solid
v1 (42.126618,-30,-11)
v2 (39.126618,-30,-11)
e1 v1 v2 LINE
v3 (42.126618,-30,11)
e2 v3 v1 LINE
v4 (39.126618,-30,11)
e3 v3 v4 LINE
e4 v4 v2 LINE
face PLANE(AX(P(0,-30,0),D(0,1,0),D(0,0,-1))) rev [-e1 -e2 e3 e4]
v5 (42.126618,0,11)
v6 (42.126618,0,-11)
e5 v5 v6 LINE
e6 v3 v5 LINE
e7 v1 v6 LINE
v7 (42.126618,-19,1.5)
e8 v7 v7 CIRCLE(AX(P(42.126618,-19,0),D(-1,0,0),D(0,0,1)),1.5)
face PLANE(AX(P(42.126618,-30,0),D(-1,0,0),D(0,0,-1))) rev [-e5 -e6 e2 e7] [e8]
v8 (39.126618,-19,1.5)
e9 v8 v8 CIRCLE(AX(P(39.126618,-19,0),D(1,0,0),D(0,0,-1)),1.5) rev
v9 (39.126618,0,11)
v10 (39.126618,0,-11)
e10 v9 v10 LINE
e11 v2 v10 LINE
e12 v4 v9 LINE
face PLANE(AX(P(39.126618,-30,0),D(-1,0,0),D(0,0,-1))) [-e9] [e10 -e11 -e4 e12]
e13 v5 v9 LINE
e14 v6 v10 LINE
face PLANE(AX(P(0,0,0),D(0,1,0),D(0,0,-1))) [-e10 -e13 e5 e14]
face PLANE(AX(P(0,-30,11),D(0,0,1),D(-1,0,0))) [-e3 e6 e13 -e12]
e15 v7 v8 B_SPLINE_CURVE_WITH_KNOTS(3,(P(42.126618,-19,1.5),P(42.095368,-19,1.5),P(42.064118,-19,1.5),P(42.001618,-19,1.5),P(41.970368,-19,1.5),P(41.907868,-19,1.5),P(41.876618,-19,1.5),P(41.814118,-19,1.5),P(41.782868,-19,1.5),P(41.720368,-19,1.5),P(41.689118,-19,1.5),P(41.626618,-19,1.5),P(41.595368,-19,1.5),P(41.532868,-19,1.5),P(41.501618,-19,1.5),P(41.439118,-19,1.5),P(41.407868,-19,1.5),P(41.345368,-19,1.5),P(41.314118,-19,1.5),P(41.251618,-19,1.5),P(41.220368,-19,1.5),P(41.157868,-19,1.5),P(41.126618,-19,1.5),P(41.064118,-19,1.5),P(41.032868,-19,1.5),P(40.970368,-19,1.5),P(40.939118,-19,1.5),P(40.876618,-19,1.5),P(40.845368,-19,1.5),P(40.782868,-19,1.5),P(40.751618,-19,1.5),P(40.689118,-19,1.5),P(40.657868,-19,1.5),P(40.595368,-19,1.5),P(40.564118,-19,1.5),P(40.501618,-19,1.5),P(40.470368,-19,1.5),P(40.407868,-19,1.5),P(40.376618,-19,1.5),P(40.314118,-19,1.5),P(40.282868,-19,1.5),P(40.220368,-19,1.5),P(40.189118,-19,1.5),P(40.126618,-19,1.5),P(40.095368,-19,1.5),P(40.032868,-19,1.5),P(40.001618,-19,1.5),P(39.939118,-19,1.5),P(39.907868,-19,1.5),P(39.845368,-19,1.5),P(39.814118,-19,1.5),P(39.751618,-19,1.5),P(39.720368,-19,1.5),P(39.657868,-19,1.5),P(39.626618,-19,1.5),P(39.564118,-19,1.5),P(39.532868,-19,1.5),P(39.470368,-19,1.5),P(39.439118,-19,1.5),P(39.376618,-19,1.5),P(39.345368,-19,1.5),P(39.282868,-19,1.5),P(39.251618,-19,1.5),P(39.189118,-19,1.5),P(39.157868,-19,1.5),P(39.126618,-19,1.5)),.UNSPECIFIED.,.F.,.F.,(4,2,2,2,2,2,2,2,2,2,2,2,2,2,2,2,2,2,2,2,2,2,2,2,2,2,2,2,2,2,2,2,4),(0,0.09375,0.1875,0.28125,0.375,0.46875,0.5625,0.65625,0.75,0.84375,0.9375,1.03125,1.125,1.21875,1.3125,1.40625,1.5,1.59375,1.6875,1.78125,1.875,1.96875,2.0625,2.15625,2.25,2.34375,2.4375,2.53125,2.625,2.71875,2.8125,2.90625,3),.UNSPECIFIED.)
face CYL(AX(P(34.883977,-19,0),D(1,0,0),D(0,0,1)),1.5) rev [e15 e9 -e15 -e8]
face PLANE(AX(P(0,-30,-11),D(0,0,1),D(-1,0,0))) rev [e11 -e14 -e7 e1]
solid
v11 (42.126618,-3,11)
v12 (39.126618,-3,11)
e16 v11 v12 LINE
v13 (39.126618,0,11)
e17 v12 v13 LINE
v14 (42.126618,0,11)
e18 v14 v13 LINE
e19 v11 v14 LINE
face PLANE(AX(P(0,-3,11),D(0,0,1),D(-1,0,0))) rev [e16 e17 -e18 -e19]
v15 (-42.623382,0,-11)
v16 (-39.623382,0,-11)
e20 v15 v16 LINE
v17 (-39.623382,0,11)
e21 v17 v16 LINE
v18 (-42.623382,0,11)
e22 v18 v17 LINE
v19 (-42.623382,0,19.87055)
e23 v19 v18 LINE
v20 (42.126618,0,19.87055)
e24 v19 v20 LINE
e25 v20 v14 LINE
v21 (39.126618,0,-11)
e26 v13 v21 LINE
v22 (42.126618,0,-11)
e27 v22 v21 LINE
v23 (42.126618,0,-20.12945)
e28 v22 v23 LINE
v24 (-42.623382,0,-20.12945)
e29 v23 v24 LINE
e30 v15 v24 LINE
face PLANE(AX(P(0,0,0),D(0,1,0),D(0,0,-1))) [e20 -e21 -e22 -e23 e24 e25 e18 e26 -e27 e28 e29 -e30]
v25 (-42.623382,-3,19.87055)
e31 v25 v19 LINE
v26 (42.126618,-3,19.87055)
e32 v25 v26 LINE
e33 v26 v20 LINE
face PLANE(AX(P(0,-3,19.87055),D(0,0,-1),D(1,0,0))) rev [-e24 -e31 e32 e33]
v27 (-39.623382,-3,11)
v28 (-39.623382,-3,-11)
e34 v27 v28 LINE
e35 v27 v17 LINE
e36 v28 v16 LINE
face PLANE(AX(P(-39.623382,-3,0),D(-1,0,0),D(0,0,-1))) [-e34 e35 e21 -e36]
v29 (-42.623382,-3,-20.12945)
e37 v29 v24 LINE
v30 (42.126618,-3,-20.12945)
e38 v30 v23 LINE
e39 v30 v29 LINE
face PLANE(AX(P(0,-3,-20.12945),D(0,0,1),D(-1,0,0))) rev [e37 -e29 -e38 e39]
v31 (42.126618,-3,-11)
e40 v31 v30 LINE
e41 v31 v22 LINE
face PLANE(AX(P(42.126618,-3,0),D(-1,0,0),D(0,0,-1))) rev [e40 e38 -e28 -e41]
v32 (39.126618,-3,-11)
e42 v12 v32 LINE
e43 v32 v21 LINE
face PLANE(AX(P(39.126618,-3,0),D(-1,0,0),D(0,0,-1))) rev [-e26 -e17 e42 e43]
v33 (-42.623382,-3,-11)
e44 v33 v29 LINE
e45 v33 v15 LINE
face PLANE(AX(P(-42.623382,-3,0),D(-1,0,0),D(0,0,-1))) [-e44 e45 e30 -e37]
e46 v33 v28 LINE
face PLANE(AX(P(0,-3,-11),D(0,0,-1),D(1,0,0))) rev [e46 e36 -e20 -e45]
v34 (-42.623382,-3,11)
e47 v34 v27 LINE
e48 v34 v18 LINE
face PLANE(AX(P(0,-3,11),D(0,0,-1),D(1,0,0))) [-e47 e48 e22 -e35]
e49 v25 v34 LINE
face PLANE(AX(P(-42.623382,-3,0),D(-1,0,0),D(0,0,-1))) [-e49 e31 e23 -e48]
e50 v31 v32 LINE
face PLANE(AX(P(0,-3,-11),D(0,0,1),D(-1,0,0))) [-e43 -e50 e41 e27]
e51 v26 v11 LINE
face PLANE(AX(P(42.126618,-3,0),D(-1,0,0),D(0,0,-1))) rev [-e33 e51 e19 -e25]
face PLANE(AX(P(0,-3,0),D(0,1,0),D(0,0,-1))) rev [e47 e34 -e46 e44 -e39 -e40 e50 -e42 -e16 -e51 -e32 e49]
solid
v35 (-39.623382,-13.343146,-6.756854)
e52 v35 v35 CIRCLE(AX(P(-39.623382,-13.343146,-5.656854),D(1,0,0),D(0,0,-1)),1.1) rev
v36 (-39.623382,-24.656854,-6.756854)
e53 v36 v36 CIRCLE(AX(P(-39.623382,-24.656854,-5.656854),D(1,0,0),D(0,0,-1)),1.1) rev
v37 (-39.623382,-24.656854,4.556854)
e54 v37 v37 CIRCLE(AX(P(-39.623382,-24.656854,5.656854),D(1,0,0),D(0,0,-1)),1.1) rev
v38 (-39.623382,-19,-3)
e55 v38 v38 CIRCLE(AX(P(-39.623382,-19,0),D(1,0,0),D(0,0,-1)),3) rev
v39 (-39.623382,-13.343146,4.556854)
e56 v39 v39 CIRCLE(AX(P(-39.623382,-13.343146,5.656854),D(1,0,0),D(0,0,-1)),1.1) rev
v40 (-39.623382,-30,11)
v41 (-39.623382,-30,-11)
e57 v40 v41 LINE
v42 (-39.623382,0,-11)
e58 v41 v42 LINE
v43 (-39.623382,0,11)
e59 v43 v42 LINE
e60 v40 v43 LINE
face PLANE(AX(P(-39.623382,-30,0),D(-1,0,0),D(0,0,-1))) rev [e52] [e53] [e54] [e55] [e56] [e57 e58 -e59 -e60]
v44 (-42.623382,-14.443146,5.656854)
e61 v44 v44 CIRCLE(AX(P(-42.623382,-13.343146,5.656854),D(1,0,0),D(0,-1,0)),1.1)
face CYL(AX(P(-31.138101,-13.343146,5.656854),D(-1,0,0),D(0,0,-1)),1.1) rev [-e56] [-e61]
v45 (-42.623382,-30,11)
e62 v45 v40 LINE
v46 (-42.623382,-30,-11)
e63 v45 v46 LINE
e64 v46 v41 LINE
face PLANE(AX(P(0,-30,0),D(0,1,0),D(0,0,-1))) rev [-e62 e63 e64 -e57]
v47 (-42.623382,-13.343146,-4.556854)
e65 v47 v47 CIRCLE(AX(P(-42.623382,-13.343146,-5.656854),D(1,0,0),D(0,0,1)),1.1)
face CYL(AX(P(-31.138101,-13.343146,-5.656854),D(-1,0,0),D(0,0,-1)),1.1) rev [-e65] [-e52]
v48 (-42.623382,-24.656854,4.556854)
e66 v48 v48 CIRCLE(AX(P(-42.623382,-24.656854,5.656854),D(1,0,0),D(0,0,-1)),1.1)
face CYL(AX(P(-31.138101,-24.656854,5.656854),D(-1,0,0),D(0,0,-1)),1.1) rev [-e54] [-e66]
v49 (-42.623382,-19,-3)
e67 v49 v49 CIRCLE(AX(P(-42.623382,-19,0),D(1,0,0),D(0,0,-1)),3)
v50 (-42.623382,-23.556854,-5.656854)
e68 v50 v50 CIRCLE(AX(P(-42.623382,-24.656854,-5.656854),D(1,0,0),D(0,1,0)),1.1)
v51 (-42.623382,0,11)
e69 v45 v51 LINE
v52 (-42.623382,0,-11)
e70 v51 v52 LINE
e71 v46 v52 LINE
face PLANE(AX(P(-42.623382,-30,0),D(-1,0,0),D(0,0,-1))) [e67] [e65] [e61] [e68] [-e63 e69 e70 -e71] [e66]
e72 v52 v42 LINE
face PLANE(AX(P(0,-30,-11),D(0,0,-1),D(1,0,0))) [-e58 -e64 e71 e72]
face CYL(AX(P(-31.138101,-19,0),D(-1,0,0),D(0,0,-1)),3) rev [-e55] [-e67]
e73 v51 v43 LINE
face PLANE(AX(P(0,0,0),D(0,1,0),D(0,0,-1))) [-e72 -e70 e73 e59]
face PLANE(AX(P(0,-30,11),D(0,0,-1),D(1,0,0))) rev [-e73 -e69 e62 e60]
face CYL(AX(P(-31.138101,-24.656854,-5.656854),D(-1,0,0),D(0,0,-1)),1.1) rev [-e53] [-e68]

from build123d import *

# Parameters (mm, degrees)
BOSS_EXTRUDE1_DEPTH         = 3
SKETCH1_3_W                 = 3
SKETCH1_3_H                 = 22
BOSS_EXTRUDE2_DEPTH         = 30
BOSS_EXTRUDE2_2_DEPTH       = 30
SKETCH2_R                   = 3
SKETCH2_R_2                 = 1.1
CUT_EXTRUDE1_DEPTH          = 3
SKETCH3_R                   = 1.5
CUT_EXTRUDE2_DEPTH          = 3
CIRPATTERN1_COUNT           = 4
BODY_MOVE_COPY1_START       = 19.870550162
BODY_MOVE_COPY1_OUTLINE_W   = 84.75
BODY_MOVE_COPY1_OUTLINE_H   = 3
BODY_MOVE_COPY1_DEPTH       = 0.258899676
BODY_MOVE_COPY1_START_2     = -20.129449838
BODY_MOVE_COPY1_2_OUTLINE_W = 84.75
BODY_MOVE_COPY1_2_OUTLINE_H = 3
BODY_MOVE_COPY1_2_DEPTH     = 0.258899676


# Read off the part's stored shape, not the designer's step: Body-Move/Copy1
with BuildPart() as part:
    # Sketch1 → Boss-Extrude1 (new body)
    with BuildSketch(Plane(origin=(0, 0, 0), x_dir=(1, 0, 0), z_dir=(0, 1, 0))):
        Polygon((42.126618123, 19.870550162), (-42.623381877, 19.870550162), (-42.623381877, 11), (-39.623381877, 11), (-39.623381877, -11), (-42.623381877, -11), (-42.623381877, -20.129449838), (42.126618123, -20.129449838), (42.126618123, -11), (39.126618123, -11), (39.126618123, 11), (42.126618123, 11), align=None)
    extrude(amount=-BOSS_EXTRUDE1_DEPTH)

    # Body-Move/Copy1 outline → Body-Move/Copy1 (cut)
    with BuildSketch(Plane.XY.offset(BODY_MOVE_COPY1_START)):
        with Locations((-0.248381877, -1.5)):
            Rectangle(BODY_MOVE_COPY1_OUTLINE_W, BODY_MOVE_COPY1_OUTLINE_H)
    extrude(amount=BODY_MOVE_COPY1_DEPTH, mode=Mode.SUBTRACT)

    # Body-Move_Copy1 2 outline → Body-Move_Copy1 2 (add)
    with BuildSketch(Plane.XY.offset(BODY_MOVE_COPY1_START_2)):
        with Locations((-0.248381877, -1.5)):
            Rectangle(BODY_MOVE_COPY1_2_OUTLINE_W, BODY_MOVE_COPY1_2_OUTLINE_H)
    extrude(amount=BODY_MOVE_COPY1_2_DEPTH)


with BuildPart() as body_2:
    # Sketch1<3> → Boss-Extrude2 (new body)
    with BuildSketch(Plane(origin=(0, 0, 0), x_dir=(1, 0, 0), z_dir=(0, 1, 0))):
        with Locations((-41.123381877, 0)):
            Rectangle(SKETCH1_3_W, SKETCH1_3_H)
    extrude(amount=-BOSS_EXTRUDE2_DEPTH)

    # Sketch2 → Cut-Extrude1 (cut)
    with BuildSketch(Plane.ZY.offset(42.623381877)):
        with Locations((0, -19)):
            Circle(SKETCH2_R)
        with Locations((-5.656854249, -24.656854249)):
            Circle(SKETCH2_R_2)
    cut_extrude1 = extrude(amount=-CUT_EXTRUDE1_DEPTH, mode=Mode.SUBTRACT)

    # CirPattern1: Cut-Extrude1 ×4 about axis
    cirpattern1_axis = Axis((0, -19, 0), (1, 0, 0))
    for i in range(1, CIRPATTERN1_COUNT):
        add(cut_extrude1.rotate(cirpattern1_axis, i * 360 / CIRPATTERN1_COUNT), mode=Mode.SUBTRACT)


with BuildPart() as body_3:
    # Sketch1<3> → Boss-Extrude2 2 (new body)
    with BuildSketch(Plane(origin=(0, 0, 0), x_dir=(1, 0, 0), z_dir=(0, 1, 0))):
        with Locations((40.626618123, 0)):
            Rectangle(SKETCH1_3_W, SKETCH1_3_H)
    extrude(amount=-BOSS_EXTRUDE2_2_DEPTH)

    # Sketch3 → Cut-Extrude2 (cut)
    with BuildSketch(Plane(origin=(42.126618123, 0, 0), x_dir=(0, 0, -1), z_dir=(1, 0, 0))):
        with Locations((0, -19)):
            Circle(SKETCH3_R)
    extrude(amount=-CUT_EXTRUDE2_DEPTH, mode=Mode.SUBTRACT)


solid = Compound([part.part, body_2.part, body_3.part])
